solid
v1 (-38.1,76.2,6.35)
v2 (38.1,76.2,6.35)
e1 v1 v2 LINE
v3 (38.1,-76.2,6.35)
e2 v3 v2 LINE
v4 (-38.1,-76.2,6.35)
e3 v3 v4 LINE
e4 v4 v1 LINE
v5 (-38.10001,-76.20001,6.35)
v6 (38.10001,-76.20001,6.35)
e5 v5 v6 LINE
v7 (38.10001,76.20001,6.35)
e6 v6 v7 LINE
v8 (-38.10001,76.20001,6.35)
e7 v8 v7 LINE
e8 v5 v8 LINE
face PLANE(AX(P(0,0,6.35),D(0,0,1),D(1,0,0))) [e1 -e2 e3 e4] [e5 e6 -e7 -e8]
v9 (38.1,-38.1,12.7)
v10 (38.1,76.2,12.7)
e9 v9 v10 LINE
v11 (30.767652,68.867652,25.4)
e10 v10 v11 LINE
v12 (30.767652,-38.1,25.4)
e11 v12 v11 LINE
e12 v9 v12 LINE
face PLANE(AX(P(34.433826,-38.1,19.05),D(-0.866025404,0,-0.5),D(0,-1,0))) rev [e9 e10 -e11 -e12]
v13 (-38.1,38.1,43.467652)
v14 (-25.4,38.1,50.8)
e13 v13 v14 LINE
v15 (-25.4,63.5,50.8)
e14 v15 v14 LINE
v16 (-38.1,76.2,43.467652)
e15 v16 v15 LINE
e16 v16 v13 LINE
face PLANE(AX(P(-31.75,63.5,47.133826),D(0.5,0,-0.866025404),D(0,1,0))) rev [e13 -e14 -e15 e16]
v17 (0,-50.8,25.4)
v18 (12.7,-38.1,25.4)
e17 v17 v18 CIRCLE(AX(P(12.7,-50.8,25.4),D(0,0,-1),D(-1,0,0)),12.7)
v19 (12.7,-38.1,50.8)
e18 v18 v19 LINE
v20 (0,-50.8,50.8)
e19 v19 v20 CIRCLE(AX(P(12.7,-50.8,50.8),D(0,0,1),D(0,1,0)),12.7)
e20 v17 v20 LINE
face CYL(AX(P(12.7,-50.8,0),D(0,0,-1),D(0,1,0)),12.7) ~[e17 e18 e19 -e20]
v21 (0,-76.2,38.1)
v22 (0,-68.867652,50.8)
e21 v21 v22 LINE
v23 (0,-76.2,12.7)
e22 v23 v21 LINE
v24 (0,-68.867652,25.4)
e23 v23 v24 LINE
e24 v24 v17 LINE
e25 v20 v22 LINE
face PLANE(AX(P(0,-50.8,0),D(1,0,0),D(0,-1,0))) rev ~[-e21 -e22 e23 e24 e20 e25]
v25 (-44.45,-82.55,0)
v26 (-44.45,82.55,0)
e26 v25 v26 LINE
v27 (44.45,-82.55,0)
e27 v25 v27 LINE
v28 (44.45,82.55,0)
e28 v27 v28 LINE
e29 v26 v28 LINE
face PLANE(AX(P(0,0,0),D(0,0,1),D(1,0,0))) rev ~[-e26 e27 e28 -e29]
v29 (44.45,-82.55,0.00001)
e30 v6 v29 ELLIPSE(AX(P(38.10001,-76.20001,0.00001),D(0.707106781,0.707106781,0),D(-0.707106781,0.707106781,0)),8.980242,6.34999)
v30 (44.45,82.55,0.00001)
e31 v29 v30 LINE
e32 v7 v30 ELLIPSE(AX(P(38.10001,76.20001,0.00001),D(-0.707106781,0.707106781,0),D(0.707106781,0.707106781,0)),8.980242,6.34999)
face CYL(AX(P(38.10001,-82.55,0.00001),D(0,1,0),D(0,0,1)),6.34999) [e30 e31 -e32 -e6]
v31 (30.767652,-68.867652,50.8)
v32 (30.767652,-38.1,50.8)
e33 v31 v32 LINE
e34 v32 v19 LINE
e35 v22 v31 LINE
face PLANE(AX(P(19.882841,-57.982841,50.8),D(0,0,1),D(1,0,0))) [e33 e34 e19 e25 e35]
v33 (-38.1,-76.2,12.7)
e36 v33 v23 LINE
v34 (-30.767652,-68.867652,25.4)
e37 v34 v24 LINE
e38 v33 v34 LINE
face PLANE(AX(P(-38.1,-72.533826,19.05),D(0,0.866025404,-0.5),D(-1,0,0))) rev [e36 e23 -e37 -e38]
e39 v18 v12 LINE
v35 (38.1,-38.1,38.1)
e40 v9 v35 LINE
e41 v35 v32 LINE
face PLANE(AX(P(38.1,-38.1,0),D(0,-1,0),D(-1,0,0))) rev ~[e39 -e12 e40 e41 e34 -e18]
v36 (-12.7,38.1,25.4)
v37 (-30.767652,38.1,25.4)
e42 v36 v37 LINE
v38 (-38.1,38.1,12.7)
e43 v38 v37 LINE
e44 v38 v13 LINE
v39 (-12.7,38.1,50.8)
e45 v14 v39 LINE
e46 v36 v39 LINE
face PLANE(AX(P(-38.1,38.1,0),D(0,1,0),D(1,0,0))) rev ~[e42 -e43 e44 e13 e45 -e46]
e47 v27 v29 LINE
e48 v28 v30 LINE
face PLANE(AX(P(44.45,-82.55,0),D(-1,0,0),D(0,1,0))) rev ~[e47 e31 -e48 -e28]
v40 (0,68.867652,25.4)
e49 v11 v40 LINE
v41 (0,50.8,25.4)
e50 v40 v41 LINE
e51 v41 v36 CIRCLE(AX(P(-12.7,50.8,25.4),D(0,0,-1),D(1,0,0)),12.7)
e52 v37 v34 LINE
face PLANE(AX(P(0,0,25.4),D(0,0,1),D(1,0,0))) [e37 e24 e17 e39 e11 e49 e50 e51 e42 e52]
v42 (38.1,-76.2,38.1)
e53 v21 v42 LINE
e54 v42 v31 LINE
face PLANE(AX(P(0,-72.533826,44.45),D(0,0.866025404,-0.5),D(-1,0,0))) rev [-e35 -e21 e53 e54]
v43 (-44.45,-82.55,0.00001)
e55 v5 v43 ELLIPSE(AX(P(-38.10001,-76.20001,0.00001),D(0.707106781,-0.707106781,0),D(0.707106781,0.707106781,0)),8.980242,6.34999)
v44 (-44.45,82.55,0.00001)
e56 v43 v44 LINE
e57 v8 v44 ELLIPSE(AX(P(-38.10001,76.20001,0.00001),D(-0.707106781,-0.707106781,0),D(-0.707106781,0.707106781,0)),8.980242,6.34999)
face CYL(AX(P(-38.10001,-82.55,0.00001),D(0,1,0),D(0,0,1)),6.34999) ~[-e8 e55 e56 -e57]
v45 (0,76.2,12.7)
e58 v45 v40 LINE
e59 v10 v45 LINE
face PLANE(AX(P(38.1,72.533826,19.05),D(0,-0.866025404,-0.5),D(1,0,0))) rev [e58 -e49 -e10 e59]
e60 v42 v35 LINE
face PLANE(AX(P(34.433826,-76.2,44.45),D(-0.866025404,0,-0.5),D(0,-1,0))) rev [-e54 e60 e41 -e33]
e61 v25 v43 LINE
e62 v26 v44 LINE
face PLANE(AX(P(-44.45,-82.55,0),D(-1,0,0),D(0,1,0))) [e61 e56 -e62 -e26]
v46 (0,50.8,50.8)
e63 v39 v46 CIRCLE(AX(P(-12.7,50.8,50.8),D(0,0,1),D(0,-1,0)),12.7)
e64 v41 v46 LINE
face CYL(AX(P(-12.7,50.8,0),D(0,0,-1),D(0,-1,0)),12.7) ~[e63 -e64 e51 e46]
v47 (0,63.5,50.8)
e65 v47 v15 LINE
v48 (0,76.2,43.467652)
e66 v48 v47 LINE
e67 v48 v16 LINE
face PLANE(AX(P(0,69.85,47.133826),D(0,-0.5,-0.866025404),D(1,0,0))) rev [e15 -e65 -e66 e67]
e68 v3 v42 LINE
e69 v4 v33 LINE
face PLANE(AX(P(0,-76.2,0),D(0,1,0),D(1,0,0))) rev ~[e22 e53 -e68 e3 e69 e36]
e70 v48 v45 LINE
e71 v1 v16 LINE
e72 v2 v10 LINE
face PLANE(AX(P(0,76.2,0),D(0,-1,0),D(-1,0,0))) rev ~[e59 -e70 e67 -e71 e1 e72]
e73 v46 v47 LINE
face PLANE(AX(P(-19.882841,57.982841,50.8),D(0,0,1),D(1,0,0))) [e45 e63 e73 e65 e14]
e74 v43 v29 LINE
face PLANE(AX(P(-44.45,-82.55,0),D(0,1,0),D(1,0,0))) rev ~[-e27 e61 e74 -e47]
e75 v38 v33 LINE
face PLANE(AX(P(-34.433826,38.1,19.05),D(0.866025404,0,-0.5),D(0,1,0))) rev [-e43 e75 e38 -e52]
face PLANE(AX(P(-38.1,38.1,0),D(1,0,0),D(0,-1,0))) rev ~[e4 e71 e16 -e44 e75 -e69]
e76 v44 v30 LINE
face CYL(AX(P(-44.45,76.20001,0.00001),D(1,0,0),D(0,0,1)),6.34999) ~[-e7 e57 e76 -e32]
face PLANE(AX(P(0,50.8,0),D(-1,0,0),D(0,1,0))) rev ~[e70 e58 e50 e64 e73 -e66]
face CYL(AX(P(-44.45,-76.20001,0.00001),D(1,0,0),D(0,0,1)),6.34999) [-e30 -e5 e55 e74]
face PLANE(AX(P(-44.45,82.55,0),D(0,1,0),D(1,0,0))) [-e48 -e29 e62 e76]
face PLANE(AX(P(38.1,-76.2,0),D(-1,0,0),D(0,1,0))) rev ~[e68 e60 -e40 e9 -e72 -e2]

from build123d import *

# Parameters (mm, degrees)
F1_DEPTH    = 25.4
F0_W        = 88.9
F0_H        = 165.1
F2_DEPTH    = 6.35
F3_DEPTH    = 50.8
F4_R        = 6.34999
F5_C1_SIZE2 = 7.3323484187
F5_C1_SIZE  = 12.7
F5_C2_SIZE2 = 12.7
F5_C2_SIZE  = 7.3323484187
F5_C3_SIZE2 = 7.3323484187
F5_C3_SIZE  = 12.7
F5_C4_SIZE2 = 7.3323484187
F5_C4_SIZE  = 12.7
F5_C5_SIZE2 = 7.3323484187
F5_C5_SIZE  = 12.7
F5_C6_SIZE2 = 7.3323484187
F5_C6_SIZE  = 12.7
F5_C7_SIZE2 = 12.7
F5_C7_SIZE  = 7.3323484187
F5_C8_SIZE2 = 7.3323484187
F5_C8_SIZE  = 12.7


# Not quite as in the source:
# - a fillet or chamfer is up to 0.001 mm smaller than in the source, because OpenCascade refuses the exact size


with BuildPart() as f1:
    # F0 (on Top) → F1 (new body)
    with BuildSketch(Plane.XY):
        with BuildLine():
            Line((38.1, -38.1), (38.1, 76.2))
            Line((38.1, 76.2), (0, 76.2))
            Line((0, 76.2), (0, 50.8))
            ThreePointArc((0, 50.8), (-3.7197438789, 41.8197438789), (-12.7, 38.1))
            Line((-12.7, 38.1), (-38.1, 38.1))
            Line((-38.1, 38.1), (-38.1, -76.2))
            Line((-38.1, -76.2), (0, -76.2))
            Line((0, -76.2), (0, -50.8))
            ThreePointArc((0, -50.8), (3.7197438789, -41.8197438789), (12.7, -38.1))
            Line((12.7, -38.1), (38.1, -38.1))
        make_face()
    extrude(amount=F1_DEPTH)

    # F0 (on Top) → F2 (join)
    with BuildSketch(Plane.XY):
        Rectangle(F0_W, F0_H)
        Polygon((0, 76.2), (38.1, 76.2), (38.1, -38.1), (38.1, -76.2), (0, -76.2), (-38.1, -76.2), (-38.1, 38.1), (-38.1, 76.2), align=None, mode=Mode.SUBTRACT)
    extrude(amount=F2_DEPTH)

    # F0 (on Top) → F3 (join)
    with BuildSketch(Plane.XY):
        with BuildLine():
            Line((38.1, -76.2), (38.1, -38.1))
            Line((38.1, -38.1), (12.7, -38.1))
            ThreePointArc((12.7, -38.1), (3.7197438789, -41.8197438789), (0, -50.8))
            Line((0, -50.8), (0, -76.2))
            Line((0, -76.2), (38.1, -76.2))
        make_face()
        with BuildLine():
            Line((0, 50.8), (0, 76.2))
            Line((0, 76.2), (-38.1, 76.2))
            Line((-38.1, 76.2), (-38.1, 38.1))
            Line((-38.1, 38.1), (-12.7, 38.1))
            ThreePointArc((-12.7, 38.1), (-3.7197438789, 41.8197438789), (0, 50.8))
        make_face()
    extrude(amount=F3_DEPTH)

    # F4 (radius 6.35 in the source; OpenCascade refuses exactly that, so slightly less here)
    f4_edges = [f1.edges().sort_by_distance(p)[0] for p in [
        (-44.45, 0, 6.35),
        (0, 82.55, 6.35),
        (44.45, 0, 6.35),
        (0, -82.55, 6.35),
    ]]
    fillet(f4_edges, radius=F4_R)

    # F5: chamfer of 12.7 x 7.3323484187 on 8 edges, made by hand

    # F5_c1
    f5_c1_edges = [f1.edges().sort_by_distance(p)[0] for p in [
        (19.05, 76.2, 25.4),
    ]]
    f5_c1_side = f1.faces().sort_by_distance((19.05, 76.2, 25.2533530316))[0]
    chamfer(f5_c1_edges, length=F5_C1_SIZE, length2=F5_C1_SIZE2, reference=f5_c1_side)

    # F5_c2
    f5_c2_edges = [f1.edges().sort_by_distance(p)[0] for p in [
        (-19.05, 76.2, 50.8),
    ]]
    f5_c2_side = f1.faces().sort_by_distance((-19.05, 76.2, 50.6533530316))[0]
    chamfer(f5_c2_edges, length=F5_C2_SIZE, length2=F5_C2_SIZE2, reference=f5_c2_side)

    # F5_c3
    f5_c3_edges = [f1.edges().sort_by_distance(p)[0] for p in [
        (38.1, -57.15, 50.8),
    ]]
    f5_c3_side = f1.faces().sort_by_distance((38.1, -57.15, 50.6533530316))[0]
    chamfer(f5_c3_edges, length=F5_C3_SIZE, length2=F5_C3_SIZE2, reference=f5_c3_side)

    # F5_c4
    f5_c4_edges = [f1.edges().sort_by_distance(p)[0] for p in [
        (38.1, 15.3838257906, 25.4),
    ]]
    f5_c4_side = f1.faces().sort_by_distance((38.1, 15.3838257906, 25.2533530316))[0]
    chamfer(f5_c4_edges, length=F5_C4_SIZE, length2=F5_C4_SIZE2, reference=f5_c4_side)

    # F5_c5
    f5_c5_edges = [f1.edges().sort_by_distance(p)[0] for p in [
        (-19.05, -76.2, 25.4),
    ]]
    f5_c5_side = f1.faces().sort_by_distance((-19.05, -76.2, 25.2533530316))[0]
    chamfer(f5_c5_edges, length=F5_C5_SIZE, length2=F5_C5_SIZE2, reference=f5_c5_side)

    # F5_c6
    f5_c6_edges = [f1.edges().sort_by_distance(p)[0] for p in [
        (15.3838257906, -76.2, 50.8),
    ]]
    f5_c6_side = f1.faces().sort_by_distance((15.3838257906, -76.2, 50.6533530316))[0]
    chamfer(f5_c6_edges, length=F5_C6_SIZE, length2=F5_C6_SIZE2, reference=f5_c6_side)

    # F5_c7
    f5_c7_edges = [f1.edges().sort_by_distance(p)[0] for p in [
        (-38.1, 50.8, 50.8),
    ]]
    f5_c7_side = f1.faces().sort_by_distance((-38.1, 50.8, 50.6533530316))[0]
    chamfer(f5_c7_edges, length=F5_C7_SIZE, length2=F5_C7_SIZE2, reference=f5_c7_side)

    # F5_c8
    f5_c8_edges = [f1.edges().sort_by_distance(p)[0] for p in [
        (-38.1, -15.3838257906, 25.4),
    ]]
    f5_c8_side = f1.faces().sort_by_distance((-38.1, -15.3838257906, 25.2533530316))[0]
    chamfer(f5_c8_edges, length=F5_C8_SIZE, length2=F5_C8_SIZE2, reference=f5_c8_side)


solid = f1.part
